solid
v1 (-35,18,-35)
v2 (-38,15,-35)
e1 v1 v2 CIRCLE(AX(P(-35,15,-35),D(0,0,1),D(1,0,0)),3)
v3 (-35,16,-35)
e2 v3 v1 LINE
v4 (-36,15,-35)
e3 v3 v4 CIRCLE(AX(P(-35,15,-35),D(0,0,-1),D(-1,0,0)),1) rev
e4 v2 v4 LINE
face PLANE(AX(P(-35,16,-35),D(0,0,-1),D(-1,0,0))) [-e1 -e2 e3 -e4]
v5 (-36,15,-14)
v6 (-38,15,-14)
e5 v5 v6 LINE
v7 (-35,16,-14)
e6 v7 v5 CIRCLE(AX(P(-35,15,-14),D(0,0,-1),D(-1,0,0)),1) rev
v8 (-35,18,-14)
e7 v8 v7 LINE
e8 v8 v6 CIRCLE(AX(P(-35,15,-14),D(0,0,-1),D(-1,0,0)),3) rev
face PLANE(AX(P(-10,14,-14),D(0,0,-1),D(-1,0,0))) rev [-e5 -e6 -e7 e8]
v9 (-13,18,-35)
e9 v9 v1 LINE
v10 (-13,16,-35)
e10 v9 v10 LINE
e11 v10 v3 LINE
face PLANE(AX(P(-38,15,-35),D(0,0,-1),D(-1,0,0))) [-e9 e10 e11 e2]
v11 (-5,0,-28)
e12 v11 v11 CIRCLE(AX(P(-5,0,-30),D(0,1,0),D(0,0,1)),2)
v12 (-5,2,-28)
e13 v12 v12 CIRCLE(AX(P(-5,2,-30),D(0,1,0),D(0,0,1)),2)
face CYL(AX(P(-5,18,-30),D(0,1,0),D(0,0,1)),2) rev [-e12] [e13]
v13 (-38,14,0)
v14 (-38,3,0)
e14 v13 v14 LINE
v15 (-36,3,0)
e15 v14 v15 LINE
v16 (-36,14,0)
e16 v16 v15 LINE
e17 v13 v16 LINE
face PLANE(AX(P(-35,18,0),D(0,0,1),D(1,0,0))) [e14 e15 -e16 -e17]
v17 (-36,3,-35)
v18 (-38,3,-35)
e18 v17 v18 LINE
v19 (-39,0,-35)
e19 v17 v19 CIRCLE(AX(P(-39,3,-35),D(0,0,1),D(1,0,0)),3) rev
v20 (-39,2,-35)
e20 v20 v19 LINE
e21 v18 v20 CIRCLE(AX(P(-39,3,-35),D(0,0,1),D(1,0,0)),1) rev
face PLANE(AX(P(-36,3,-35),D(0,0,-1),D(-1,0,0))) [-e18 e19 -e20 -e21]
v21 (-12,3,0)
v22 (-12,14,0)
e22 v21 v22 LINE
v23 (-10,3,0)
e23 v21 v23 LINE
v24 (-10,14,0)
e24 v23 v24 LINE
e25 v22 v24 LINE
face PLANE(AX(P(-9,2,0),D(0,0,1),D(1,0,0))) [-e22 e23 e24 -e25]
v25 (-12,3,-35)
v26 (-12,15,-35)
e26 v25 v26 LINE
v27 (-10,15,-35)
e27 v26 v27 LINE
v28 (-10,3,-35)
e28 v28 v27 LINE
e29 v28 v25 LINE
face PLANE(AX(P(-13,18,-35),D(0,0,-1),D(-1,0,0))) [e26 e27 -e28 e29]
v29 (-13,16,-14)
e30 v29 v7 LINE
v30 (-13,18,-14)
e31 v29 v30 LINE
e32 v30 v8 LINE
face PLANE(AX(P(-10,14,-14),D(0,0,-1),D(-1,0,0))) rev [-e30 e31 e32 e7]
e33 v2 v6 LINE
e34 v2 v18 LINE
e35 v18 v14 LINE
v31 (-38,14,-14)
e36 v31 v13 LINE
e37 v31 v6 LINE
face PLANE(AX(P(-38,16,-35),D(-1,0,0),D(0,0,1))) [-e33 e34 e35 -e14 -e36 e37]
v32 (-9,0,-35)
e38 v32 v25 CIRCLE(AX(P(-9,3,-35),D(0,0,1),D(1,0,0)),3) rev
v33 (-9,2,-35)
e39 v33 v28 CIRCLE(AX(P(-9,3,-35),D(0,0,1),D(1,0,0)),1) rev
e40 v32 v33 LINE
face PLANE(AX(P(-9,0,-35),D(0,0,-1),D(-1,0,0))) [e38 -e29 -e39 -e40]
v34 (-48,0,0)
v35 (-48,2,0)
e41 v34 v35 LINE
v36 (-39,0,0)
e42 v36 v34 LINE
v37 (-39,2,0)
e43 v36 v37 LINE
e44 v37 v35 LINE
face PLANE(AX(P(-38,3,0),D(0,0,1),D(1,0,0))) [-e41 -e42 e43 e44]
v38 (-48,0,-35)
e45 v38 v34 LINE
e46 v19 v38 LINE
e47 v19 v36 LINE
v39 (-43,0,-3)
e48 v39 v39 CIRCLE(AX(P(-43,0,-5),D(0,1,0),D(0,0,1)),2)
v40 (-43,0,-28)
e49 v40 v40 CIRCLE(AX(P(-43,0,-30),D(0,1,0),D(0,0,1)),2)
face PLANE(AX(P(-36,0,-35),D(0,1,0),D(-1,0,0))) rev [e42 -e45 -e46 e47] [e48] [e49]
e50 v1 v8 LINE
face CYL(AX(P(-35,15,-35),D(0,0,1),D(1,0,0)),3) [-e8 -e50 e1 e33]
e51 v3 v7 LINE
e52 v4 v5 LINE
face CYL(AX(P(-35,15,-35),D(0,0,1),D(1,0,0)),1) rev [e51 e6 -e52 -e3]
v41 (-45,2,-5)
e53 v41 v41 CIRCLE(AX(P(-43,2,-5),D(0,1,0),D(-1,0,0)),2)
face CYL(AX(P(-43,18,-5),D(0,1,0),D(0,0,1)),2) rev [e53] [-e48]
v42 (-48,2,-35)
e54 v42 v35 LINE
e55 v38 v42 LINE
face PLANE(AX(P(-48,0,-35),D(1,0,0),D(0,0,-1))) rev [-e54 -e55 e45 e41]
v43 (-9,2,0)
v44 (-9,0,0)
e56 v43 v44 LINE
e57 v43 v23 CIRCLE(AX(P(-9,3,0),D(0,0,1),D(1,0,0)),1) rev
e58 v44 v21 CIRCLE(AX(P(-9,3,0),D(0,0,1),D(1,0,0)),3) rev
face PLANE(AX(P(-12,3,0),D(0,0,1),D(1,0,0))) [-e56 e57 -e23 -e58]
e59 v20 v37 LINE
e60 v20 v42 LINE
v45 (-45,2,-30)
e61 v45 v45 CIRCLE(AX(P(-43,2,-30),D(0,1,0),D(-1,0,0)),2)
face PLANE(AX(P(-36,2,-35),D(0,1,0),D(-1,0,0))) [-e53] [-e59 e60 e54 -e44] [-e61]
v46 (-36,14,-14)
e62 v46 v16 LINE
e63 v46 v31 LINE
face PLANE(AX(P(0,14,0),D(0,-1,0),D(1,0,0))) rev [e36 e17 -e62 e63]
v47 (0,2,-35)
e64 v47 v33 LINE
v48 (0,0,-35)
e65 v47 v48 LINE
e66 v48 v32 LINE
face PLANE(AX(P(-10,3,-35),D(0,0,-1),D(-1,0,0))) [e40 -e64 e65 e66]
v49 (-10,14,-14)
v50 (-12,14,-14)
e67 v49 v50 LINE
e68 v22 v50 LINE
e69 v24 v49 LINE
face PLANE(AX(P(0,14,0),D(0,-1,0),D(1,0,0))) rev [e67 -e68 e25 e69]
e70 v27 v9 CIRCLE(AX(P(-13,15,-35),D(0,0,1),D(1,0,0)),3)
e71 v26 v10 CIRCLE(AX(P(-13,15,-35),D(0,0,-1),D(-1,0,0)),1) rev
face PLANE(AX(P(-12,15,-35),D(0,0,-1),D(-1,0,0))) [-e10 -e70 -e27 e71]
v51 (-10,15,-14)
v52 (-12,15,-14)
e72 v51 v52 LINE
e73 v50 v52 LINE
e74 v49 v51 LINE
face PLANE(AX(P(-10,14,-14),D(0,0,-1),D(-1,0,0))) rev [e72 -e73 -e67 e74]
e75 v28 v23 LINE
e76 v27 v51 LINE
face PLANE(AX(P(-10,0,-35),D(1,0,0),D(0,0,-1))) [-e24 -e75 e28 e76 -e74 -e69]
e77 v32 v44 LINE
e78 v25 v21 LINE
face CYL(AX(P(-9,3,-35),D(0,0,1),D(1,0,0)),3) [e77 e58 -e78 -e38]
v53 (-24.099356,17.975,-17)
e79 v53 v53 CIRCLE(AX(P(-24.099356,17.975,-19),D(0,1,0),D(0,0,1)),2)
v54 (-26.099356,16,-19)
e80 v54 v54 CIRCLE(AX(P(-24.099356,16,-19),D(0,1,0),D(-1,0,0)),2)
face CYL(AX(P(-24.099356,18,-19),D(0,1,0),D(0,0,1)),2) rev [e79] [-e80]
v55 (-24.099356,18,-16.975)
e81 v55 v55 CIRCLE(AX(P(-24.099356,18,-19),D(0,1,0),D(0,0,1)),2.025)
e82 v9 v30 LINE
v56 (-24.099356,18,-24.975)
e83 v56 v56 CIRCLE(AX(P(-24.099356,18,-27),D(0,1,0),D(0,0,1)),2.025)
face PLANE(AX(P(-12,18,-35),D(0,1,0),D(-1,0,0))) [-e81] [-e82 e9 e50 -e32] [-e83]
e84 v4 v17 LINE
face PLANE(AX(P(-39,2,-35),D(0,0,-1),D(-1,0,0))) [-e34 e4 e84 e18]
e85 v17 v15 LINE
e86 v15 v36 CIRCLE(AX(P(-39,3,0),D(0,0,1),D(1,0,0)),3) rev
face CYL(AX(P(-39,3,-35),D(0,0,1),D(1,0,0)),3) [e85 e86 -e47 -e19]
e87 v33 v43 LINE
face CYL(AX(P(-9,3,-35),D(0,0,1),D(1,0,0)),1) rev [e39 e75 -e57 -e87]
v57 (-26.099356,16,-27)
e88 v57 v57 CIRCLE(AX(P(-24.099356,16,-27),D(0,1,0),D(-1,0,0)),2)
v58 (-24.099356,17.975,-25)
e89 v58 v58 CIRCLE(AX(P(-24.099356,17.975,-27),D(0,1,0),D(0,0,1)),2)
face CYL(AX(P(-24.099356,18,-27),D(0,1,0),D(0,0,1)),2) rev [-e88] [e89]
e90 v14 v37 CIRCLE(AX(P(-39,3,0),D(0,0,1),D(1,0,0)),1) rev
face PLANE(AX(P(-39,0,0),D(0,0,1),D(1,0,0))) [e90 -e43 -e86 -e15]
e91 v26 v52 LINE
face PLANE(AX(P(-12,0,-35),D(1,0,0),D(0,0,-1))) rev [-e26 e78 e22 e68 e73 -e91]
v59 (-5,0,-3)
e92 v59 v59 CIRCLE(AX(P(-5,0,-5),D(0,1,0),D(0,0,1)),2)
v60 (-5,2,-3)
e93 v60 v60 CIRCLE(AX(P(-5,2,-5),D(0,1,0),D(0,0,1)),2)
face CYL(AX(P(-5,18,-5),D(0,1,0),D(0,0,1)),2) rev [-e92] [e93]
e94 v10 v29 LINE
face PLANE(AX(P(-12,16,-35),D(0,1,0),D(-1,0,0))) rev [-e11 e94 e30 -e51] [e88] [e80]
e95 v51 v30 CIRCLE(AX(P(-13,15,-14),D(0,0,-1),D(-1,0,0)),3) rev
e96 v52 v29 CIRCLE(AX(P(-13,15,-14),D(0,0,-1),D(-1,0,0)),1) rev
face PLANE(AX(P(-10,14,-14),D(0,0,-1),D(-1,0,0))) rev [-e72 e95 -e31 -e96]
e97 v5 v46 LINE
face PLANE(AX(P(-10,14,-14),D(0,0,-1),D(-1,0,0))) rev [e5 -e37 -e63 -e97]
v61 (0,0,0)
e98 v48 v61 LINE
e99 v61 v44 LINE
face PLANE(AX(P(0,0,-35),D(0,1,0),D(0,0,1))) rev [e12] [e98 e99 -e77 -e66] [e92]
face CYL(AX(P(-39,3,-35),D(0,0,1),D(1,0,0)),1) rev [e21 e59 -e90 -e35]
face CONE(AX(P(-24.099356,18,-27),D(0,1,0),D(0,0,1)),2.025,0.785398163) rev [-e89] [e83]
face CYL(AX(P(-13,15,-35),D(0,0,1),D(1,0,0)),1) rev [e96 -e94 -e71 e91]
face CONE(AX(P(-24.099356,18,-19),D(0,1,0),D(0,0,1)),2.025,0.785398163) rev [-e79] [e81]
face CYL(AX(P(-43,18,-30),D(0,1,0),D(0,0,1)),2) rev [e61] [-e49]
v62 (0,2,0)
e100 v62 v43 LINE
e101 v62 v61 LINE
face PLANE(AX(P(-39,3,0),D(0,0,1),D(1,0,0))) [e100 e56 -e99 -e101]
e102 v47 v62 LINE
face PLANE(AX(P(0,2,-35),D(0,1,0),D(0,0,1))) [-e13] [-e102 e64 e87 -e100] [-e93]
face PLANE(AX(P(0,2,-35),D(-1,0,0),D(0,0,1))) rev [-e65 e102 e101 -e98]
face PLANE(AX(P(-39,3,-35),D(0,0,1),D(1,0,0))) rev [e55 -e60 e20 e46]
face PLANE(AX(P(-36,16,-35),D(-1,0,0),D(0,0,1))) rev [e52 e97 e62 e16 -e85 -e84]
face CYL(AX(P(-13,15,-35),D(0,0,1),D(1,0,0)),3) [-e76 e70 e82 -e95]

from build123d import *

# Parameters (mm, degrees)
BASE_FLANGE1_DEPTH                 = 35
SKETCH6_W                          = 28
SKETCH6_H                          = 14
CUT_EXTRUDE1_DEPTH                 = 4
F_4_0_4_DIAMETER_HOLE1_D           = 4
F_4_0_4_DIAMETER_HOLE1_CSINK_D     = 4.05
F_4_0_4_DIAMETER_HOLE1_CSINK_ANGLE = 90


# Sheet-metal steps are written as plain solids
with BuildPart() as part:
    # Sketch1 → Base-Flange1 (new body)
    with BuildSketch(Plane.XY):
        with BuildLine():
            Line((0, 0), (-9, 0))
            ThreePointArc((-9, 0), (-11.121320344, 0.878679656), (-12, 3))
            Line((-12, 3), (-12, 15))
            ThreePointArc((-12, 15), (-12.292893219, 15.707106781), (-13, 16))
            Line((-13, 16), (-35, 16))
            ThreePointArc((-35, 16), (-35.707106781, 15.707106781), (-36, 15))
            Line((-36, 15), (-36, 3))
            ThreePointArc((-36, 3), (-36.878679656, 0.878679656), (-39, 0))
            Line((-39, 0), (-48, 0))
            Line((-48, 0), (-48, 2))
            Line((-48, 2), (-39, 2))
            ThreePointArc((-39, 2), (-38.292893219, 2.292893219), (-38, 3))
            Line((-38, 3), (-38, 15))
            ThreePointArc((-38, 15), (-37.121320344, 17.121320344), (-35, 18))
            Line((-35, 18), (-13, 18))
            ThreePointArc((-13, 18), (-10.878679656, 17.121320344), (-10, 15))
            Line((-10, 15), (-10, 3))
            ThreePointArc((-10, 3), (-9.707106781, 2.292893219), (-9, 2))
            Line((-9, 2), (0, 2))
            Line((0, 2), (0, 0))
        make_face()
    extrude(amount=-BASE_FLANGE1_DEPTH)

    # Sketch6 → Cut-Extrude1 (cut)
    with BuildSketch(Plane(origin=(0, 18, 0), x_dir=(1, 0, 0), z_dir=(0, 1, 0))):
        with Locations((-24, 7)):
            Rectangle(SKETCH6_W, SKETCH6_H)
    extrude(amount=-CUT_EXTRUDE1_DEPTH, mode=Mode.SUBTRACT)

    # Ø4.0 (4) Diameter Hole1 (through all)
    with Locations(Plane(origin=(0, 18, 0), x_dir=(1, 0, 0), z_dir=(0, 1, 0))):
        with Locations((-24.099356194, 27), (-24.099356194, 19), (-43, 30), (-43, 5), (-5, 5), (-5, 30)):
            CounterSinkHole(F_4_0_4_DIAMETER_HOLE1_D / 2, F_4_0_4_DIAMETER_HOLE1_CSINK_D / 2, counter_sink_angle=F_4_0_4_DIAMETER_HOLE1_CSINK_ANGLE)


solid = part.part
